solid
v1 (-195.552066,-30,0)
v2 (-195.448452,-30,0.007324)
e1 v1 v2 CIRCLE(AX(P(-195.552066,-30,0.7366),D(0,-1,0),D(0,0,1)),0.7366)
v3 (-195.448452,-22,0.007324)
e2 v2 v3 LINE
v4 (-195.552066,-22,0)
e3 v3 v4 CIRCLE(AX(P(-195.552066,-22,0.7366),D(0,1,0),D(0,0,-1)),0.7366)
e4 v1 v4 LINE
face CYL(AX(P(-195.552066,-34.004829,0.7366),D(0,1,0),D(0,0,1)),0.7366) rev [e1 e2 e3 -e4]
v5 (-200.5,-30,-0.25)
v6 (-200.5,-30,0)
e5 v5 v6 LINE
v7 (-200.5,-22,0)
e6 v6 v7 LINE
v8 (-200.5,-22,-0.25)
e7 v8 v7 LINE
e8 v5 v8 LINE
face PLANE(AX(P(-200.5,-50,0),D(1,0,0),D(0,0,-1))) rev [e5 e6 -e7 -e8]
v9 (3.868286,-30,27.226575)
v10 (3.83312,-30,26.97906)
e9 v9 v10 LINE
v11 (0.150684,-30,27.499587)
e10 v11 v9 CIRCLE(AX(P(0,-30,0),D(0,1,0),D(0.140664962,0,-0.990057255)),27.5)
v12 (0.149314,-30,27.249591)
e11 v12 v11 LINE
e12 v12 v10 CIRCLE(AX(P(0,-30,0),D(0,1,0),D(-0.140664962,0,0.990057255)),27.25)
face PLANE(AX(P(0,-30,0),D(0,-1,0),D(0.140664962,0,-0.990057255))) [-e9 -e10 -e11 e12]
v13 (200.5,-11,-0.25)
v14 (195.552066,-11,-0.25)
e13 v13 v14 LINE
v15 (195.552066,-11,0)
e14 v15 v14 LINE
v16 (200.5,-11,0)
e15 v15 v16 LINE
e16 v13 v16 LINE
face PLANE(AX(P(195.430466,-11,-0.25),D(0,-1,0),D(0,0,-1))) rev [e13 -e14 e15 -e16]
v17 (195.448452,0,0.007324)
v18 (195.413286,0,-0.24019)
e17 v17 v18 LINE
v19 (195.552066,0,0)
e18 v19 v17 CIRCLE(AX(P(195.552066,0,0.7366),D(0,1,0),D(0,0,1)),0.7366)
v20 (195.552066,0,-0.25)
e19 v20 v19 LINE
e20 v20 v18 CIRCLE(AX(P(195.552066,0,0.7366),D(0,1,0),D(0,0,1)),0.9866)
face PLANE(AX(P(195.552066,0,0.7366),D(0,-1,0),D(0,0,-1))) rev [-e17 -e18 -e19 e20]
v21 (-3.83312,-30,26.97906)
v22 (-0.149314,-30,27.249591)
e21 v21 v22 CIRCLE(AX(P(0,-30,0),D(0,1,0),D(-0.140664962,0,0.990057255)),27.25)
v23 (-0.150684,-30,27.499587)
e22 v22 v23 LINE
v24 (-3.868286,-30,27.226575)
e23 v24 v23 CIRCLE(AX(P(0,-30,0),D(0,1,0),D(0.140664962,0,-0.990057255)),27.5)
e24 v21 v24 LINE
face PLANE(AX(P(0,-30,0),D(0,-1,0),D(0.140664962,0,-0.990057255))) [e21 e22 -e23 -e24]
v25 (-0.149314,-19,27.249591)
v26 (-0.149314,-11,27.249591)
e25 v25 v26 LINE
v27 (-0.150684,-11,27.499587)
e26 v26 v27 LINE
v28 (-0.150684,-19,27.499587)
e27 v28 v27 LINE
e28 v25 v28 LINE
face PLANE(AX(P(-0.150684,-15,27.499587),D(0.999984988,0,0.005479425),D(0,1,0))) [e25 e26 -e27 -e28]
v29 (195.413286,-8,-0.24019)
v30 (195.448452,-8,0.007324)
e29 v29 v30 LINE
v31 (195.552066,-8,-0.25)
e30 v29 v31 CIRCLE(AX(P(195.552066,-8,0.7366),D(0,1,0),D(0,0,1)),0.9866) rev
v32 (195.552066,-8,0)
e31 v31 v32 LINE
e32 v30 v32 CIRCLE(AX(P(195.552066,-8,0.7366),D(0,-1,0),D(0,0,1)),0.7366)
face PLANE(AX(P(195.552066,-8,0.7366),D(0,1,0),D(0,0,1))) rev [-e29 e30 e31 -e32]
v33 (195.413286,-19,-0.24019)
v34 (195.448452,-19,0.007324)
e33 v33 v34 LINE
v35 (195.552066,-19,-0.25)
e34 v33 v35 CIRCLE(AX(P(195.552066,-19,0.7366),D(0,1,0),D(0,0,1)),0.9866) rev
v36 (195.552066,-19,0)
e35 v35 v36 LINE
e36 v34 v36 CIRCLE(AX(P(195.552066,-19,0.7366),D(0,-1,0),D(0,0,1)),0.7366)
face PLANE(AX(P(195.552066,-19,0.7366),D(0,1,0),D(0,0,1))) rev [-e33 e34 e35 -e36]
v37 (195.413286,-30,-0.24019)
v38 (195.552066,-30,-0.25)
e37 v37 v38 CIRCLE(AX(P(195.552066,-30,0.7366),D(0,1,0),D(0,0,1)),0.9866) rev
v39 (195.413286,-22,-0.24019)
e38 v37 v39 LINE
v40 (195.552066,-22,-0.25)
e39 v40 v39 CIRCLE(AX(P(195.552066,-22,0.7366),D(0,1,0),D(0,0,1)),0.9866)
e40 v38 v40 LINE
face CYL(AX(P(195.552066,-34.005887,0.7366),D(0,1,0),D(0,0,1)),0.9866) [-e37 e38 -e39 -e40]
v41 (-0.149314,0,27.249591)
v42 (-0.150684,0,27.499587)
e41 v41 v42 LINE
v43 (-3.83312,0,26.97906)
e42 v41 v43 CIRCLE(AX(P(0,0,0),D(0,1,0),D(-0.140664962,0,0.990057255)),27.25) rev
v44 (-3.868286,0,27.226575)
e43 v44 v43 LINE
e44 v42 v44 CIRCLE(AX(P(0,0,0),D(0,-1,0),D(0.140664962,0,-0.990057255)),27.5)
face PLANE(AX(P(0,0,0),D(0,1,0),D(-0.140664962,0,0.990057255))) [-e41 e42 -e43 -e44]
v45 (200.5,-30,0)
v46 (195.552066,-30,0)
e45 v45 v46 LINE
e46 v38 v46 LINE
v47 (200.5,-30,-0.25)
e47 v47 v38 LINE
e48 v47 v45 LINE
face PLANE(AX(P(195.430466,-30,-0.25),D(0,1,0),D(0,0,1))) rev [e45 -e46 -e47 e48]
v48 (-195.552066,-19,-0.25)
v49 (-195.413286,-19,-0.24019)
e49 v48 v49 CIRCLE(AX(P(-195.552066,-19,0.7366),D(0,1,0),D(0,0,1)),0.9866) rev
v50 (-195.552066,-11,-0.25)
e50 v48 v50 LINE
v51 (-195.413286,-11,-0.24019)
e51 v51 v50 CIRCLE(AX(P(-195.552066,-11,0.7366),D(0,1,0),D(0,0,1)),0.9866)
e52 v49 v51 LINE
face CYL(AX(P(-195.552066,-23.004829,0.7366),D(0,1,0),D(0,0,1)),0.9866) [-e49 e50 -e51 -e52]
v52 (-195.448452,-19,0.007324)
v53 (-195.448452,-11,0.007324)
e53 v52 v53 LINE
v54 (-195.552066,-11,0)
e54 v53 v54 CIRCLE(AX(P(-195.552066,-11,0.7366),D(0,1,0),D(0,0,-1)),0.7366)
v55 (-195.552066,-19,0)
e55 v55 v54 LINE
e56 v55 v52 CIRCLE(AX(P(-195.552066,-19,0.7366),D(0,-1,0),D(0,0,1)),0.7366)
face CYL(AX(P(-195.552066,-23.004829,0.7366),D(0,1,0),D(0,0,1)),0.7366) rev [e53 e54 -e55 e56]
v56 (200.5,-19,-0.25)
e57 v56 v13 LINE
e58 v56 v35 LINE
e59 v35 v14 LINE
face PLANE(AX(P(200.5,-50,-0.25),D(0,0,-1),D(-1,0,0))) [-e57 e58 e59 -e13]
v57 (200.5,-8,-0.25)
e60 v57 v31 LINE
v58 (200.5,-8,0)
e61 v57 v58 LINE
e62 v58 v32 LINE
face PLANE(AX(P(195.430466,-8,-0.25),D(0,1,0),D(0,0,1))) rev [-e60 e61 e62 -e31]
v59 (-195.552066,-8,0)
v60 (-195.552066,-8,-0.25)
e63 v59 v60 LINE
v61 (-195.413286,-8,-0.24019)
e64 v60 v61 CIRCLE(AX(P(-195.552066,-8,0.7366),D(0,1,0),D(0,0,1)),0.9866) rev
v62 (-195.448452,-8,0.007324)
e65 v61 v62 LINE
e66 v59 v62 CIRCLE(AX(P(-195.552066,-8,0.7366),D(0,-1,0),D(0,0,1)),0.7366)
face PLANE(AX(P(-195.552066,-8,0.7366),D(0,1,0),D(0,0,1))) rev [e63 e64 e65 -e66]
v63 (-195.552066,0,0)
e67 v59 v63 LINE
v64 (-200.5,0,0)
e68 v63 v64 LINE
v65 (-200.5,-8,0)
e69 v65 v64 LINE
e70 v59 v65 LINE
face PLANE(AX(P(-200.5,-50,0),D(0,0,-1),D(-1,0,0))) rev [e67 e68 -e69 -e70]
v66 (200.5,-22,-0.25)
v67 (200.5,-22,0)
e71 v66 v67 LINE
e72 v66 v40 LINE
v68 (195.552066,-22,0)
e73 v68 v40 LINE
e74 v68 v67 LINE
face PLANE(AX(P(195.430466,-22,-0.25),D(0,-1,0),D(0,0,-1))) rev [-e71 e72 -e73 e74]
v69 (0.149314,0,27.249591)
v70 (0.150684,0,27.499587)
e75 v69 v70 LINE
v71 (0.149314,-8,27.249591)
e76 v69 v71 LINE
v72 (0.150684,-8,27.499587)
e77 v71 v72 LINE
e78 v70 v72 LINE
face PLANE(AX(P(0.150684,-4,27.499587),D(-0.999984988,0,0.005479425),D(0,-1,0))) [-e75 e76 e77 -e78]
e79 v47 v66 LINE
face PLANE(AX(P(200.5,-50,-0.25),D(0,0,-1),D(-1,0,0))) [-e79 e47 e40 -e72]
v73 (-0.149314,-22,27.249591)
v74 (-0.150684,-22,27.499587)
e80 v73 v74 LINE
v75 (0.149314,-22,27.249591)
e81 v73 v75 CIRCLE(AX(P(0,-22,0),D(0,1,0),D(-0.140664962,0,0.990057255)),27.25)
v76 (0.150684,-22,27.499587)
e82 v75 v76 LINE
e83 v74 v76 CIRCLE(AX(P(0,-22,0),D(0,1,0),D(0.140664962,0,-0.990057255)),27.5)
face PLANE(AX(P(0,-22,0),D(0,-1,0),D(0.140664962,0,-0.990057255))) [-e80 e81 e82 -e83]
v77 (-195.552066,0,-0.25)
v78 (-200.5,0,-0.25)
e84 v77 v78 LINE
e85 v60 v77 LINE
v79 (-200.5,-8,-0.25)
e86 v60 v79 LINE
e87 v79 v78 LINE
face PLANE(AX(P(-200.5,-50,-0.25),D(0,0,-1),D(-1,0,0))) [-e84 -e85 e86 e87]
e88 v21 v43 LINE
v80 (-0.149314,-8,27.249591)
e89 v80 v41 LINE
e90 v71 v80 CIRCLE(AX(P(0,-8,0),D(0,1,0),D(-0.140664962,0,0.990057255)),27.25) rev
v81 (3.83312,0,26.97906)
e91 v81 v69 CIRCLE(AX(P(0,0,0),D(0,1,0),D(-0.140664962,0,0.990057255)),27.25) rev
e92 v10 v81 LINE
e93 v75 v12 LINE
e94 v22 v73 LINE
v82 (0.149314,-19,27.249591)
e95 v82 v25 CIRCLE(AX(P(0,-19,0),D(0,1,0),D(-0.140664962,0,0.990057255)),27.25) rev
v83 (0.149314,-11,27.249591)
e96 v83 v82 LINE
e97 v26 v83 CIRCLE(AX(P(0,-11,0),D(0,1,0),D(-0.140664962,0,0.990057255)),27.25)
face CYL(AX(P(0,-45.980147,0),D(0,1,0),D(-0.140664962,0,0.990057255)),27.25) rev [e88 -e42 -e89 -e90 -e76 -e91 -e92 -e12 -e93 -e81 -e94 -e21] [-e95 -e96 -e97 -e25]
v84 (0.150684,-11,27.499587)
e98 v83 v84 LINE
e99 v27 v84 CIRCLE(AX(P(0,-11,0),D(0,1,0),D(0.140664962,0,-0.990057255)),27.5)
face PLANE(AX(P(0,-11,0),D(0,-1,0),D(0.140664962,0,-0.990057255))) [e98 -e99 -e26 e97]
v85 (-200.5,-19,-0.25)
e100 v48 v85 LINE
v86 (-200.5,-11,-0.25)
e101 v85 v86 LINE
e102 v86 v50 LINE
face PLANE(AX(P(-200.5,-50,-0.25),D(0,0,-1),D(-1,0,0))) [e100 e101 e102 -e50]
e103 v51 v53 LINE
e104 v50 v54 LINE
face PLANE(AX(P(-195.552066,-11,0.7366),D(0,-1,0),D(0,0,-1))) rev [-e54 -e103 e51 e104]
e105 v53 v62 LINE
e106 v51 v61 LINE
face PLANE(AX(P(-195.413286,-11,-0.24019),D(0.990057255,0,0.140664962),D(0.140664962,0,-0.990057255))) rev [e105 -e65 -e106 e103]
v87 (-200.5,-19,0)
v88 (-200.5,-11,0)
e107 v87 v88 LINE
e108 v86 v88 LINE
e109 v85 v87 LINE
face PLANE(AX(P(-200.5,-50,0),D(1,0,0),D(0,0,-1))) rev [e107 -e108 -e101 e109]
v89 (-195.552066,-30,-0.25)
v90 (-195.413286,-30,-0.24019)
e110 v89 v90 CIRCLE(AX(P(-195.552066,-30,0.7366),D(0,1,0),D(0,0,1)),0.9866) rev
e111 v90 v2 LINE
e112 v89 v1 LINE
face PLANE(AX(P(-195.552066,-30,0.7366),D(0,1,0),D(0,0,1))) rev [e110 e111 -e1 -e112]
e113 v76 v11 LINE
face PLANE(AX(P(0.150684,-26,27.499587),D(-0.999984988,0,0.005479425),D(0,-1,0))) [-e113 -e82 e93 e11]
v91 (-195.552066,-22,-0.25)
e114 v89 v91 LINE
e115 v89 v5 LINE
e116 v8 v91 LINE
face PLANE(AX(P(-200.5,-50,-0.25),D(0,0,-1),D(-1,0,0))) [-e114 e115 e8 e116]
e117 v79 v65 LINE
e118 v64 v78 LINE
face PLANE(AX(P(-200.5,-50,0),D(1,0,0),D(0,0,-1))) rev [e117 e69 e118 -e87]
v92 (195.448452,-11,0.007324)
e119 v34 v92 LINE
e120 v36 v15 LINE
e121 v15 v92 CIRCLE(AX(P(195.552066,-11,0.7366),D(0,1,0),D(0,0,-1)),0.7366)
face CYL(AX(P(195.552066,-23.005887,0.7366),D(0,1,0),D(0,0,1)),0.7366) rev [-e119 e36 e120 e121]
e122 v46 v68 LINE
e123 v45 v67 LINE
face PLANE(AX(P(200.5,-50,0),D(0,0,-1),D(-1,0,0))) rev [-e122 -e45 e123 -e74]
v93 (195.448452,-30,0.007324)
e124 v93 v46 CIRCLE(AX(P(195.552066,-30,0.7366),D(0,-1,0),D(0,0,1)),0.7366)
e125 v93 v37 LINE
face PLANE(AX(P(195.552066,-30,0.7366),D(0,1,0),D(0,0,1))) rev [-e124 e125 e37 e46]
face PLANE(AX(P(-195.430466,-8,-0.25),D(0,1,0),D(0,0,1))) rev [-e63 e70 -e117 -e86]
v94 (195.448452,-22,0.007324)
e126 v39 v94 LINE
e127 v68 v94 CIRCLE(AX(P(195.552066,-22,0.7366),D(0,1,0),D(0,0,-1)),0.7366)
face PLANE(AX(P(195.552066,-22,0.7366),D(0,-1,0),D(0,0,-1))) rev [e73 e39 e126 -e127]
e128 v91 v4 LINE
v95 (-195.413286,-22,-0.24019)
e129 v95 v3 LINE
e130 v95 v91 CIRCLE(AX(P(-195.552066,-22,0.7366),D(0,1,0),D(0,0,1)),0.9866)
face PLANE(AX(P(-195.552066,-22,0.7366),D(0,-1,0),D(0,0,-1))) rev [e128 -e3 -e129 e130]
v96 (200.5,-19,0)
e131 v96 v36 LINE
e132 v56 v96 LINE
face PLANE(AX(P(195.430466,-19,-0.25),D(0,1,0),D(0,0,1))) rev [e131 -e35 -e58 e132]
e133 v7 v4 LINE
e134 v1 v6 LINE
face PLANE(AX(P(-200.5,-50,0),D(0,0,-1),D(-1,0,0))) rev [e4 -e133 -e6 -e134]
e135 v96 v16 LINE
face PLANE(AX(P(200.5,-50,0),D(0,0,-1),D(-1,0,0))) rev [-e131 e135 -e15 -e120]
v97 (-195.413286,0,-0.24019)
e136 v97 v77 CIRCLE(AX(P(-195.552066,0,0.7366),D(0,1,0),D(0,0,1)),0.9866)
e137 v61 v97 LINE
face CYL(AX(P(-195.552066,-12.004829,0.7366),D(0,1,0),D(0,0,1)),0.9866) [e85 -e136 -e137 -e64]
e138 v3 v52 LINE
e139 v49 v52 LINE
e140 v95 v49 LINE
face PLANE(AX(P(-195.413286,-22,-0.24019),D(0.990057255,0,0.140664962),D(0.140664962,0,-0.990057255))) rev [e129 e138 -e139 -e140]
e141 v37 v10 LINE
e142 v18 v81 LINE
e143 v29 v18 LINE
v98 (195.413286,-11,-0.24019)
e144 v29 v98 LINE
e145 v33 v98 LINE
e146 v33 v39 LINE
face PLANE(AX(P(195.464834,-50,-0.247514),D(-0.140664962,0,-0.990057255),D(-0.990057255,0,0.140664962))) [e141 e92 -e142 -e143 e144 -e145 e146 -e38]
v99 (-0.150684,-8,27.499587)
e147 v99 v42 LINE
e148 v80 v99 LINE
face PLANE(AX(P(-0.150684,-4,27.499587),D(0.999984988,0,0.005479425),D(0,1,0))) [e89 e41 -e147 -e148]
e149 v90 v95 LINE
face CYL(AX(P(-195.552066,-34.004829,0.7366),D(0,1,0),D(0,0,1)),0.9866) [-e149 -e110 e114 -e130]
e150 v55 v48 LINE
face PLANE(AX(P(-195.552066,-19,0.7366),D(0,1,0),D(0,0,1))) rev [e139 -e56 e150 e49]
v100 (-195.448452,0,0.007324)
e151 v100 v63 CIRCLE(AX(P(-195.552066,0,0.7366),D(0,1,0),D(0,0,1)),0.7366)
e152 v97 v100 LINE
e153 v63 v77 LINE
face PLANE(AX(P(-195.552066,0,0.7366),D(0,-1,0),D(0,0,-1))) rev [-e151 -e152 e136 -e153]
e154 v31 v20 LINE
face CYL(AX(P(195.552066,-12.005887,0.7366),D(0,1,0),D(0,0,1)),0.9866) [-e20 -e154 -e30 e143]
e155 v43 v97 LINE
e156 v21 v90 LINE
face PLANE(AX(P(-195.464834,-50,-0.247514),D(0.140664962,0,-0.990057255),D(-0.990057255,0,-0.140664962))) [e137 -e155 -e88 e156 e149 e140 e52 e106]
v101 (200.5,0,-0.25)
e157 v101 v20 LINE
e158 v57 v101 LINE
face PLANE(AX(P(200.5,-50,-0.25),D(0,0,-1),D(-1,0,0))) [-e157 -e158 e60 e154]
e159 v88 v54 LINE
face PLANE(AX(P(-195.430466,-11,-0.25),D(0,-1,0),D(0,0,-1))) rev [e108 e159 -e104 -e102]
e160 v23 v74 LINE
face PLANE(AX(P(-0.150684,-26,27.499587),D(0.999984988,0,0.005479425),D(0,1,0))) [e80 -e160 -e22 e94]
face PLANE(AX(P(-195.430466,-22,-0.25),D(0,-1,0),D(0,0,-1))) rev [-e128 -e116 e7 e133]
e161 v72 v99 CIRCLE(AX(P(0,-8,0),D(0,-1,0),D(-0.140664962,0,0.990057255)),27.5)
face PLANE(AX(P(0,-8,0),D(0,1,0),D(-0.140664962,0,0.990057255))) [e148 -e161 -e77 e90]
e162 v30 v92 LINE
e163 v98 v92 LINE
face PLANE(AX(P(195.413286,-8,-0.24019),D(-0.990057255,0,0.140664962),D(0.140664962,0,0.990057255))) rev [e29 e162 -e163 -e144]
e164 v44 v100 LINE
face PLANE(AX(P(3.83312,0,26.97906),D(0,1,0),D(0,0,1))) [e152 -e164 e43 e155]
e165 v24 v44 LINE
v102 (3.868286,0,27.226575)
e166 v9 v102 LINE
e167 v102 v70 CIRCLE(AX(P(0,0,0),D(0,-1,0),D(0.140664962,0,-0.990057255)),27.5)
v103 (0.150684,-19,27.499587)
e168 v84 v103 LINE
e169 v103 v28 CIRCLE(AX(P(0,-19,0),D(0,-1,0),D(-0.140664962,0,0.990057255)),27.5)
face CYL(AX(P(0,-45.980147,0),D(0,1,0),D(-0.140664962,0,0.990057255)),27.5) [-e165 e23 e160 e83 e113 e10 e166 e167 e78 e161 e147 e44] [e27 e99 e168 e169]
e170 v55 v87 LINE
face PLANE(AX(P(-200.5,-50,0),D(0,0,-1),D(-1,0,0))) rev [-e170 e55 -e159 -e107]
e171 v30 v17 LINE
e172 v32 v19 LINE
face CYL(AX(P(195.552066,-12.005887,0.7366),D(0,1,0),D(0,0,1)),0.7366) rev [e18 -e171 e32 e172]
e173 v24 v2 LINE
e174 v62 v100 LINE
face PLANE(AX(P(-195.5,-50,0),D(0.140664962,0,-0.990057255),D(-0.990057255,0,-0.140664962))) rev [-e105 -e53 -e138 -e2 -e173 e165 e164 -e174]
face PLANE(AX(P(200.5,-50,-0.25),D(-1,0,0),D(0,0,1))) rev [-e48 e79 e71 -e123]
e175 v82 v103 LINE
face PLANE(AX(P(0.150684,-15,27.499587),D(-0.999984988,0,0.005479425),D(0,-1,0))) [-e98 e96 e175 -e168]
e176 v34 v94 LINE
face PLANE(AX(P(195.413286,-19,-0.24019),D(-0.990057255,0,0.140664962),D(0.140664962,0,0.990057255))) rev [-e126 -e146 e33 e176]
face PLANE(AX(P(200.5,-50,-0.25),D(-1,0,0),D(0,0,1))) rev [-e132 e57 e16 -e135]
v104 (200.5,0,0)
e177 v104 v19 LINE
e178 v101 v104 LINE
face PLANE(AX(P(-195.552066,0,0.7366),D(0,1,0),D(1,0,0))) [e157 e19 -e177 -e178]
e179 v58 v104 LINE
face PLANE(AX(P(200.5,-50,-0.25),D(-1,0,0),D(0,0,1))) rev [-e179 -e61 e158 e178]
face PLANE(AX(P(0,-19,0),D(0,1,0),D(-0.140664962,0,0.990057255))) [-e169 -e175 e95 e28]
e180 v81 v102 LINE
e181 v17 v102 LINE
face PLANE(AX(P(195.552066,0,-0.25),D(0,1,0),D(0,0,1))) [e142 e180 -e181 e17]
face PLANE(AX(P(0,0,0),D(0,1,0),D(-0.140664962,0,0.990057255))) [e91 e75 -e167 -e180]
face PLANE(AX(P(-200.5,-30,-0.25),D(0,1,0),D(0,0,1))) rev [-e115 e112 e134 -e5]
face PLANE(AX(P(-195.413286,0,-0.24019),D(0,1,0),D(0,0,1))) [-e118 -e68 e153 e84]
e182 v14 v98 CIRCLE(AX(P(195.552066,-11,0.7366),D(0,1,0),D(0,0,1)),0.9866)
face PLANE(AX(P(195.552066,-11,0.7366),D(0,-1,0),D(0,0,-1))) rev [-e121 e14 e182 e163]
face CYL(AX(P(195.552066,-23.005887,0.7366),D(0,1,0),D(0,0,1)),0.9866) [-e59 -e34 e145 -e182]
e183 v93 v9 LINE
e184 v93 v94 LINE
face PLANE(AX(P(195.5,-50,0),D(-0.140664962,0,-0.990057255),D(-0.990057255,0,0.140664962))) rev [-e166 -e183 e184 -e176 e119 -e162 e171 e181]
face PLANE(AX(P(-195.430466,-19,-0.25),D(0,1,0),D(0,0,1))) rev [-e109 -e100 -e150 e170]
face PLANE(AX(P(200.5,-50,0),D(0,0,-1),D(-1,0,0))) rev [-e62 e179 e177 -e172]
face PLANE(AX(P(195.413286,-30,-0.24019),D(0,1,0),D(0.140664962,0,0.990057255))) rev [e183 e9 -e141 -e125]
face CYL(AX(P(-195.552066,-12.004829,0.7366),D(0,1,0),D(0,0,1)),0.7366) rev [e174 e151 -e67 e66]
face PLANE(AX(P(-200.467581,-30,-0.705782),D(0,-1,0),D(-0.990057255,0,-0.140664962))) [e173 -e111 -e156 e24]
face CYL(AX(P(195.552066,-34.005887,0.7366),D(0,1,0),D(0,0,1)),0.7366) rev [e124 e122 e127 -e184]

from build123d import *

# Parameters (mm, degrees)
BASE_FLANGE1_DEPTH  = 50
UNFOLD1_START       = -50
UNFOLD1_DEPTH       = 50
UNFOLD1_2_OUTLINE_W = 3.874357202
UNFOLD1_2_OUTLINE_H = 0.25
UNFOLD1_2_DEPTH     = 50
CUT_EXTRUDE2_DEPTH  = 211.401854511
SKETCH6_W           = 5.069534468
SKETCH6_H           = 3
CUT_EXTRUDE3_DEPTH  = 211.401854511
LPATTERN2_COUNT     = 2
LPATTERN2_PITCH     = 11
SKETCH8_W           = 0.3
SKETCH8_H           = 8
CUT_EXTRUDE4_DEPTH  = 211.401854511
LPATTERN3_COUNT     = 5
LPATTERN3_PITCH     = 11
SKETCH9_W           = 404.874357202
SKETCH9_H           = 46.767764052
CUT_EXTRUDE5_DEPTH  = 211.398245103
FOLD1_START         = -30
FOLD1_OUTLINE_W     = 3.874357202
FOLD1_OUTLINE_H     = 0.25
FOLD1_DEPTH         = 30
FOLD1_START_2       = -22
FOLD1_2_DEPTH       = 3
FOLD1_START_3       = -11
FOLD1_3_DEPTH       = 3
FOLD1_4_DEPTH       = 30
FOLD1_5_DEPTH       = 3
FOLD1_6_DEPTH       = 3
FOLD1_7_DEPTH       = 8
FOLD1_START_4       = -19
FOLD1_8_DEPTH       = 8
FOLD1_START_5       = -8
FOLD1_9_DEPTH       = 8


# Read off the part's stored shape, not the designer's step: Unfold1, Fold1
# Sheet-metal steps are written as plain solids
with BuildPart() as part:
    # Sketch1 → Base-Flange1 (new body)
    with BuildSketch(Plane(origin=(0, 0, 0), x_dir=(1, 0, 0), z_dir=(0, 1, 0))):
        with BuildLine():
            Line((-200.5, 0), (-195.552065744, 0))
            ThreePointArc((-195.552065744, 0), (-195.50012958, -0.001833238), (-195.448451933, -0.007323826))
            Line((-195.448451933, -0.007323826), (-3.868286445, -27.226574518))
            ThreePointArc((-3.868286445, -27.226574518), (0, -27.5), (3.868286445, -27.226574518))
            Line((3.868286445, -27.226574518), (195.448451933, -0.007323826))
            ThreePointArc((195.448451933, -0.007323826), (195.50012958, -0.001833238), (195.552065744, 0))
            Line((195.552065744, 0), (200.5, 0))
            Line((200.5, 0), (200.5, 0.25))
            Line((200.5, 0.25), (195.552065744, 0.25))
            ThreePointArc((195.552065744, 0.25), (195.48250259, 0.247544566), (195.413285693, 0.240190488))
            Line((195.413285692, 0.240190488), (3.833120205, -26.979060204))
            ThreePointArc((3.833120205, -26.979060204), (0, -27.25), (-3.833120205, -26.979060204))
            Line((-3.833120205, -26.979060204), (-195.413285692, 0.240190488))
            ThreePointArc((-195.413285692, 0.240190488), (-195.48250259, 0.247544566), (-195.552065743, 0.25))
            Line((-195.552065744, 0.25), (-200.5, 0.25))
            Line((-200.5, 0.25), (-200.5, 0))
        make_face()
    extrude(amount=-BASE_FLANGE1_DEPTH)

    # Unfold1 outline → Unfold1 (cut)
    with BuildSketch(Plane(origin=(0, 0, 0), x_dir=(1, 0, 0), z_dir=(0, 1, 0)).offset(UNFOLD1_START)):
        with BuildLine():
            Line((195.552065744, 0), (193.722727272, 0))
            Line((193.722727272, 0), (3.833120205, -26.979060204))
            ThreePointArc((3.833120205, -26.979060204), (0, -27.25), (-3.833120205, -26.979060204))
            Line((-3.833120205, -26.979060204), (-193.722727272, 0))
            Line((-193.722727272, 0), (-195.552065744, 0))
            ThreePointArc((-195.552065744, 0), (-195.500129581, -0.001833238), (-195.448451933, -0.007323826))
            Line((-195.448451933, -0.007323826), (-3.868286445, -27.226574518))
            ThreePointArc((-3.868286445, -27.226574518), (0, -27.5), (3.868286445, -27.226574518))
            Line((3.868286445, -27.226574518), (195.448451933, -0.007323826))
            ThreePointArc((195.448451933, -0.007323826), (195.500129581, -0.001833238), (195.552065744, 0))
        make_face()
    extrude(amount=UNFOLD1_DEPTH, mode=Mode.SUBTRACT)

    # Unfold1 2 outline → Unfold1 2 (add)
    with BuildSketch(Plane(origin=(0, 0, 0), x_dir=(1, 0, 0), z_dir=(0, 1, 0)).offset(UNFOLD1_START)):
        with BuildLine():
            ThreePointArc((195.413285692, 0.240190488), (195.48250259, 0.247544566), (195.552065744, 0.25))
            Line((195.552065744, 0.25), (-195.552065744, 0.25))
            ThreePointArc((-195.552065744, 0.25), (-195.48250259, 0.247544566), (-195.413285692, 0.240190488))
            Line((-195.413285692, 0.240190488), (-193.722727272, 0))
            Line((-193.722727272, 0), (193.722727272, 0))
            Line((193.722727272, 0), (195.413285692, 0.240190488))
        make_face()
        with Locations((202.437178601, 0.125)):
            Rectangle(UNFOLD1_2_OUTLINE_W, UNFOLD1_2_OUTLINE_H)
    extrude(amount=UNFOLD1_2_DEPTH)

    # Sketch7 → Cut-Extrude2 (cut, through all)
    with BuildSketch(Plane.XY):
        Polygon((-200.5, -30), (-195.552065744, -30), (1.937178601, -50), (199.304822734, -30), (204.374357202, -30), (227.072555567, -34.066984848), (175.364463115, -76.287353915), (-151.111703925, -76.287353915), (-215.740676819, -64.707357595), align=None)
    extrude(amount=-CUT_EXTRUDE2_DEPTH, mode=Mode.SUBTRACT)

    # Sketch6 → Cut-Extrude3 (cut, through all)
    with BuildSketch(Plane.XY):
        with Locations((-197.965232766, -9.5)):
            Rectangle(SKETCH6_W, SKETCH6_H)
        with Locations((201.839589968, -9.5)):
            Rectangle(SKETCH6_W, SKETCH6_H)
    cut_extrude3 = extrude(amount=-CUT_EXTRUDE3_DEPTH, mode=Mode.SUBTRACT)

    # LPattern2: Cut-Extrude3 ×2
    with Locations(*[(0, -i * LPATTERN2_PITCH, 0) for i in range(1, LPATTERN2_COUNT)]):
        add(cut_extrude3, mode=Mode.SUBTRACT)

    # Sketch8 → Cut-Extrude4 (cut, through all)
    with BuildSketch(Plane.XY):
        with Locations((1.937178601, -4)):
            Rectangle(SKETCH8_W, SKETCH8_H)
    cut_extrude4 = extrude(amount=-CUT_EXTRUDE4_DEPTH, mode=Mode.SUBTRACT)

    # LPattern3: Cut-Extrude4 ×5
    with Locations(*[(0, -i * LPATTERN3_PITCH, 0) for i in range(1, LPATTERN3_COUNT)]):
        add(cut_extrude4, mode=Mode.SUBTRACT)

    # Sketch9 → Cut-Extrude5 (cut, through all)
    with BuildSketch(Plane.XY):
        with Locations((1.937178601, -53.383882026)):
            Rectangle(SKETCH9_W, SKETCH9_H)
    extrude(amount=-CUT_EXTRUDE5_DEPTH, mode=Mode.SUBTRACT)

    # Fold1 outline → Fold1 (cut)
    with BuildSketch(Plane(origin=(0, 0, 0), x_dir=(1, 0, 0), z_dir=(0, 1, 0)).offset(FOLD1_START)):
        with BuildLine():
            Line((193.722727272, 0), (195.413285692, 0.240190488))
            ThreePointArc((195.413285692, 0.240190488), (195.48250259, 0.247544566), (195.552065744, 0.25))
            Line((195.552065744, 0.25), (-195.552065744, 0.25))
            ThreePointArc((-195.552065744, 0.25), (-195.48250259, 0.247544566), (-195.413285692, 0.240190488))
            Line((-195.413285692, 0.240190488), (-193.722727272, 0))
            Line((-193.722727272, 0), (193.722727272, 0))
        make_face()
        with Locations((202.437178601, 0.125)):
            Rectangle(FOLD1_OUTLINE_W, FOLD1_OUTLINE_H)
    extrude(amount=FOLD1_DEPTH, mode=Mode.SUBTRACT)

    # Fold1 2 outline → Fold1 2 (cut)
    with BuildSketch(Plane(origin=(0, 0, 0), x_dir=(1, 0, 0), z_dir=(0, 1, 0)).offset(FOLD1_START_2)):
        with BuildLine():
            ThreePointArc((195.552065744, 0.25), (195.48250259, 0.247544566), (195.413285692, 0.240190488))
            Line((195.413285692, 0.240190488), (195.447411381, 0))
            Line((195.447411381, 0), (199.304822734, 0))
            Line((199.304822734, 0), (199.304822734, 0.25))
            Line((199.304822734, 0.25), (195.552065744, 0.25))
        make_face()
        with BuildLine():
            Line((-195.430465532, 0.119271783), (-195.413285692, 0.240190488))
            ThreePointArc((-195.413285692, 0.240190488), (-195.42187059, 0.241371769), (-195.430465532, 0.242477601))
            Line((-195.430465532, 0.242477601), (-195.430465532, 0.119271783))
        make_face()
    extrude(amount=FOLD1_2_DEPTH, mode=Mode.SUBTRACT)

    # Fold1 3 outline → Fold1 3 (cut)
    with BuildSketch(Plane(origin=(0, 0, 0), x_dir=(1, 0, 0), z_dir=(0, 1, 0)).offset(FOLD1_START_3)):
        with BuildLine():
            ThreePointArc((195.552065744, 0.25), (195.48250259, 0.247544566), (195.413285692, 0.240190488))
            Line((195.413285692, 0.240190488), (195.447411381, 0))
            Line((195.447411381, 0), (199.304822734, 0))
            Line((199.304822734, 0), (199.304822734, 0.25))
            Line((199.304822734, 0.25), (195.552065744, 0.25))
        make_face()
        with BuildLine():
            Line((-195.430465532, 0.119271783), (-195.413285692, 0.240190488))
            ThreePointArc((-195.413285692, 0.240190488), (-195.42187059, 0.241371769), (-195.430465532, 0.242477601))
            Line((-195.430465532, 0.242477601), (-195.430465532, 0.119271783))
        make_face()
    extrude(amount=FOLD1_3_DEPTH, mode=Mode.SUBTRACT)

    # Fold1 4 outline → Fold1 4 (add)
    with BuildSketch(Plane(origin=(0, 0, 0), x_dir=(1, 0, 0), z_dir=(0, 1, 0)).offset(FOLD1_START)):
        with BuildLine():
            Line((195.447411381, 0), (193.722727272, 0))
            Line((193.722727272, 0), (3.833120205, -26.979060204))
            ThreePointArc((3.833120205, -26.979060204), (1.99580633, -27.176814697), (0.149314321, -27.249590919))
            Line((0.149314321, -27.249590919), (0.150684177, -27.499587166))
            ThreePointArc((0.150684177, -27.499587166), (2.014116479, -27.426143273), (3.868286445, -27.226574518))
            Line((3.868286445, -27.226574518), (195.448451933, -0.007323826))
            Line((195.448451933, -0.007323826), (195.447411381, 0))
        make_face()
        with BuildLine():
            Line((-0.150684177, -27.499587166), (-0.149314321, -27.249590919))
            ThreePointArc((-0.149314321, -27.249590919), (-1.99580633, -27.176814697), (-3.833120205, -26.979060204))
            Line((-3.833120205, -26.979060204), (-193.722727272, 0))
            Line((-193.722727272, 0), (-195.430465532, 0))
            Line((-195.430465532, 0), (-195.430465532, 0.119271783))
            Line((-195.430465532, 0.119271783), (-195.448451933, -0.007323826))
            Line((-195.448451933, -0.007323826), (-3.868286445, -27.226574518))
            ThreePointArc((-3.868286445, -27.226574518), (-2.014116479, -27.426143273), (-0.150684177, -27.499587166))
        make_face()
    extrude(amount=FOLD1_4_DEPTH)

    # Fold1 5 outline → Fold1 5 (add)
    with BuildSketch(Plane(origin=(0, 0, 0), x_dir=(1, 0, 0), z_dir=(0, 1, 0)).offset(FOLD1_START_2)):
        with BuildLine():
            Line((0.150684177, -27.499587166), (0.149314321, -27.249590919))
            ThreePointArc((0.149314321, -27.249590919), (0, -27.25), (-0.149314321, -27.249590919))
            Line((-0.149314321, -27.249590919), (-0.150684177, -27.499587166))
            ThreePointArc((-0.150684177, -27.499587166), (0, -27.5), (0.150684177, -27.499587166))
        make_face()
    extrude(amount=FOLD1_5_DEPTH)

    # Fold1 6 outline → Fold1 6 (add)
    with BuildSketch(Plane(origin=(0, 0, 0), x_dir=(1, 0, 0), z_dir=(0, 1, 0)).offset(FOLD1_START_3)):
        with BuildLine():
            Line((0.150684177, -27.499587166), (0.149314321, -27.249590919))
            ThreePointArc((0.149314321, -27.249590919), (0, -27.25), (-0.149314321, -27.249590919))
            Line((-0.149314321, -27.249590919), (-0.150684177, -27.499587166))
            ThreePointArc((-0.150684177, -27.499587166), (0, -27.5), (0.150684177, -27.499587166))
        make_face()
    extrude(amount=FOLD1_6_DEPTH)

    # Fold1 7 outline → Fold1 7 (add)
    with BuildSketch(Plane(origin=(0, 0, 0), x_dir=(1, 0, 0), z_dir=(0, 1, 0)).offset(FOLD1_START)):
        with BuildLine():
            Line((195.552065744, 0), (195.447411381, 0))
            Line((195.447411381, 0), (195.448451933, -0.007323826))
            ThreePointArc((195.448451933, -0.007323826), (195.500129581, -0.001833238), (195.552065744, 0))
        make_face()
        with BuildLine():
            ThreePointArc((-195.552065744, 0), (-195.500129581, -0.001833238), (-195.448451933, -0.007323826))
            Line((-195.448451933, -0.007323826), (-195.447411381, 0))
            Line((-195.447411381, 0), (-195.552065744, 0))
        make_face()
    extrude(amount=FOLD1_7_DEPTH)

    # Fold1 8 outline → Fold1 8 (add)
    with BuildSketch(Plane(origin=(0, 0, 0), x_dir=(1, 0, 0), z_dir=(0, 1, 0)).offset(FOLD1_START_4)):
        with BuildLine():
            Line((195.552065744, 0), (195.447411381, 0))
            Line((195.447411381, 0), (195.448451933, -0.007323826))
            ThreePointArc((195.448451933, -0.007323826), (195.500129581, -0.001833238), (195.552065744, 0))
        make_face()
        with BuildLine():
            ThreePointArc((-195.552065744, 0), (-195.500129581, -0.001833238), (-195.448451933, -0.007323826))
            Line((-195.448451933, -0.007323826), (-195.447411381, 0))
            Line((-195.447411381, 0), (-195.552065744, 0))
        make_face()
    extrude(amount=FOLD1_8_DEPTH)

    # Fold1 9 outline → Fold1 9 (add)
    with BuildSketch(Plane(origin=(0, 0, 0), x_dir=(1, 0, 0), z_dir=(0, 1, 0)).offset(FOLD1_START_5)):
        with BuildLine():
            Line((195.552065744, 0), (195.447411381, 0))
            Line((195.447411381, 0), (195.448451933, -0.007323826))
            ThreePointArc((195.448451933, -0.007323826), (195.500129581, -0.001833238), (195.552065744, 0))
        make_face()
        with BuildLine():
            ThreePointArc((-195.552065744, 0), (-195.500129581, -0.001833238), (-195.448451933, -0.007323826))
            Line((-195.448451933, -0.007323826), (-195.447411381, 0))
            Line((-195.447411381, 0), (-195.552065744, 0))
        make_face()
    extrude(amount=FOLD1_9_DEPTH)


solid = part.part
